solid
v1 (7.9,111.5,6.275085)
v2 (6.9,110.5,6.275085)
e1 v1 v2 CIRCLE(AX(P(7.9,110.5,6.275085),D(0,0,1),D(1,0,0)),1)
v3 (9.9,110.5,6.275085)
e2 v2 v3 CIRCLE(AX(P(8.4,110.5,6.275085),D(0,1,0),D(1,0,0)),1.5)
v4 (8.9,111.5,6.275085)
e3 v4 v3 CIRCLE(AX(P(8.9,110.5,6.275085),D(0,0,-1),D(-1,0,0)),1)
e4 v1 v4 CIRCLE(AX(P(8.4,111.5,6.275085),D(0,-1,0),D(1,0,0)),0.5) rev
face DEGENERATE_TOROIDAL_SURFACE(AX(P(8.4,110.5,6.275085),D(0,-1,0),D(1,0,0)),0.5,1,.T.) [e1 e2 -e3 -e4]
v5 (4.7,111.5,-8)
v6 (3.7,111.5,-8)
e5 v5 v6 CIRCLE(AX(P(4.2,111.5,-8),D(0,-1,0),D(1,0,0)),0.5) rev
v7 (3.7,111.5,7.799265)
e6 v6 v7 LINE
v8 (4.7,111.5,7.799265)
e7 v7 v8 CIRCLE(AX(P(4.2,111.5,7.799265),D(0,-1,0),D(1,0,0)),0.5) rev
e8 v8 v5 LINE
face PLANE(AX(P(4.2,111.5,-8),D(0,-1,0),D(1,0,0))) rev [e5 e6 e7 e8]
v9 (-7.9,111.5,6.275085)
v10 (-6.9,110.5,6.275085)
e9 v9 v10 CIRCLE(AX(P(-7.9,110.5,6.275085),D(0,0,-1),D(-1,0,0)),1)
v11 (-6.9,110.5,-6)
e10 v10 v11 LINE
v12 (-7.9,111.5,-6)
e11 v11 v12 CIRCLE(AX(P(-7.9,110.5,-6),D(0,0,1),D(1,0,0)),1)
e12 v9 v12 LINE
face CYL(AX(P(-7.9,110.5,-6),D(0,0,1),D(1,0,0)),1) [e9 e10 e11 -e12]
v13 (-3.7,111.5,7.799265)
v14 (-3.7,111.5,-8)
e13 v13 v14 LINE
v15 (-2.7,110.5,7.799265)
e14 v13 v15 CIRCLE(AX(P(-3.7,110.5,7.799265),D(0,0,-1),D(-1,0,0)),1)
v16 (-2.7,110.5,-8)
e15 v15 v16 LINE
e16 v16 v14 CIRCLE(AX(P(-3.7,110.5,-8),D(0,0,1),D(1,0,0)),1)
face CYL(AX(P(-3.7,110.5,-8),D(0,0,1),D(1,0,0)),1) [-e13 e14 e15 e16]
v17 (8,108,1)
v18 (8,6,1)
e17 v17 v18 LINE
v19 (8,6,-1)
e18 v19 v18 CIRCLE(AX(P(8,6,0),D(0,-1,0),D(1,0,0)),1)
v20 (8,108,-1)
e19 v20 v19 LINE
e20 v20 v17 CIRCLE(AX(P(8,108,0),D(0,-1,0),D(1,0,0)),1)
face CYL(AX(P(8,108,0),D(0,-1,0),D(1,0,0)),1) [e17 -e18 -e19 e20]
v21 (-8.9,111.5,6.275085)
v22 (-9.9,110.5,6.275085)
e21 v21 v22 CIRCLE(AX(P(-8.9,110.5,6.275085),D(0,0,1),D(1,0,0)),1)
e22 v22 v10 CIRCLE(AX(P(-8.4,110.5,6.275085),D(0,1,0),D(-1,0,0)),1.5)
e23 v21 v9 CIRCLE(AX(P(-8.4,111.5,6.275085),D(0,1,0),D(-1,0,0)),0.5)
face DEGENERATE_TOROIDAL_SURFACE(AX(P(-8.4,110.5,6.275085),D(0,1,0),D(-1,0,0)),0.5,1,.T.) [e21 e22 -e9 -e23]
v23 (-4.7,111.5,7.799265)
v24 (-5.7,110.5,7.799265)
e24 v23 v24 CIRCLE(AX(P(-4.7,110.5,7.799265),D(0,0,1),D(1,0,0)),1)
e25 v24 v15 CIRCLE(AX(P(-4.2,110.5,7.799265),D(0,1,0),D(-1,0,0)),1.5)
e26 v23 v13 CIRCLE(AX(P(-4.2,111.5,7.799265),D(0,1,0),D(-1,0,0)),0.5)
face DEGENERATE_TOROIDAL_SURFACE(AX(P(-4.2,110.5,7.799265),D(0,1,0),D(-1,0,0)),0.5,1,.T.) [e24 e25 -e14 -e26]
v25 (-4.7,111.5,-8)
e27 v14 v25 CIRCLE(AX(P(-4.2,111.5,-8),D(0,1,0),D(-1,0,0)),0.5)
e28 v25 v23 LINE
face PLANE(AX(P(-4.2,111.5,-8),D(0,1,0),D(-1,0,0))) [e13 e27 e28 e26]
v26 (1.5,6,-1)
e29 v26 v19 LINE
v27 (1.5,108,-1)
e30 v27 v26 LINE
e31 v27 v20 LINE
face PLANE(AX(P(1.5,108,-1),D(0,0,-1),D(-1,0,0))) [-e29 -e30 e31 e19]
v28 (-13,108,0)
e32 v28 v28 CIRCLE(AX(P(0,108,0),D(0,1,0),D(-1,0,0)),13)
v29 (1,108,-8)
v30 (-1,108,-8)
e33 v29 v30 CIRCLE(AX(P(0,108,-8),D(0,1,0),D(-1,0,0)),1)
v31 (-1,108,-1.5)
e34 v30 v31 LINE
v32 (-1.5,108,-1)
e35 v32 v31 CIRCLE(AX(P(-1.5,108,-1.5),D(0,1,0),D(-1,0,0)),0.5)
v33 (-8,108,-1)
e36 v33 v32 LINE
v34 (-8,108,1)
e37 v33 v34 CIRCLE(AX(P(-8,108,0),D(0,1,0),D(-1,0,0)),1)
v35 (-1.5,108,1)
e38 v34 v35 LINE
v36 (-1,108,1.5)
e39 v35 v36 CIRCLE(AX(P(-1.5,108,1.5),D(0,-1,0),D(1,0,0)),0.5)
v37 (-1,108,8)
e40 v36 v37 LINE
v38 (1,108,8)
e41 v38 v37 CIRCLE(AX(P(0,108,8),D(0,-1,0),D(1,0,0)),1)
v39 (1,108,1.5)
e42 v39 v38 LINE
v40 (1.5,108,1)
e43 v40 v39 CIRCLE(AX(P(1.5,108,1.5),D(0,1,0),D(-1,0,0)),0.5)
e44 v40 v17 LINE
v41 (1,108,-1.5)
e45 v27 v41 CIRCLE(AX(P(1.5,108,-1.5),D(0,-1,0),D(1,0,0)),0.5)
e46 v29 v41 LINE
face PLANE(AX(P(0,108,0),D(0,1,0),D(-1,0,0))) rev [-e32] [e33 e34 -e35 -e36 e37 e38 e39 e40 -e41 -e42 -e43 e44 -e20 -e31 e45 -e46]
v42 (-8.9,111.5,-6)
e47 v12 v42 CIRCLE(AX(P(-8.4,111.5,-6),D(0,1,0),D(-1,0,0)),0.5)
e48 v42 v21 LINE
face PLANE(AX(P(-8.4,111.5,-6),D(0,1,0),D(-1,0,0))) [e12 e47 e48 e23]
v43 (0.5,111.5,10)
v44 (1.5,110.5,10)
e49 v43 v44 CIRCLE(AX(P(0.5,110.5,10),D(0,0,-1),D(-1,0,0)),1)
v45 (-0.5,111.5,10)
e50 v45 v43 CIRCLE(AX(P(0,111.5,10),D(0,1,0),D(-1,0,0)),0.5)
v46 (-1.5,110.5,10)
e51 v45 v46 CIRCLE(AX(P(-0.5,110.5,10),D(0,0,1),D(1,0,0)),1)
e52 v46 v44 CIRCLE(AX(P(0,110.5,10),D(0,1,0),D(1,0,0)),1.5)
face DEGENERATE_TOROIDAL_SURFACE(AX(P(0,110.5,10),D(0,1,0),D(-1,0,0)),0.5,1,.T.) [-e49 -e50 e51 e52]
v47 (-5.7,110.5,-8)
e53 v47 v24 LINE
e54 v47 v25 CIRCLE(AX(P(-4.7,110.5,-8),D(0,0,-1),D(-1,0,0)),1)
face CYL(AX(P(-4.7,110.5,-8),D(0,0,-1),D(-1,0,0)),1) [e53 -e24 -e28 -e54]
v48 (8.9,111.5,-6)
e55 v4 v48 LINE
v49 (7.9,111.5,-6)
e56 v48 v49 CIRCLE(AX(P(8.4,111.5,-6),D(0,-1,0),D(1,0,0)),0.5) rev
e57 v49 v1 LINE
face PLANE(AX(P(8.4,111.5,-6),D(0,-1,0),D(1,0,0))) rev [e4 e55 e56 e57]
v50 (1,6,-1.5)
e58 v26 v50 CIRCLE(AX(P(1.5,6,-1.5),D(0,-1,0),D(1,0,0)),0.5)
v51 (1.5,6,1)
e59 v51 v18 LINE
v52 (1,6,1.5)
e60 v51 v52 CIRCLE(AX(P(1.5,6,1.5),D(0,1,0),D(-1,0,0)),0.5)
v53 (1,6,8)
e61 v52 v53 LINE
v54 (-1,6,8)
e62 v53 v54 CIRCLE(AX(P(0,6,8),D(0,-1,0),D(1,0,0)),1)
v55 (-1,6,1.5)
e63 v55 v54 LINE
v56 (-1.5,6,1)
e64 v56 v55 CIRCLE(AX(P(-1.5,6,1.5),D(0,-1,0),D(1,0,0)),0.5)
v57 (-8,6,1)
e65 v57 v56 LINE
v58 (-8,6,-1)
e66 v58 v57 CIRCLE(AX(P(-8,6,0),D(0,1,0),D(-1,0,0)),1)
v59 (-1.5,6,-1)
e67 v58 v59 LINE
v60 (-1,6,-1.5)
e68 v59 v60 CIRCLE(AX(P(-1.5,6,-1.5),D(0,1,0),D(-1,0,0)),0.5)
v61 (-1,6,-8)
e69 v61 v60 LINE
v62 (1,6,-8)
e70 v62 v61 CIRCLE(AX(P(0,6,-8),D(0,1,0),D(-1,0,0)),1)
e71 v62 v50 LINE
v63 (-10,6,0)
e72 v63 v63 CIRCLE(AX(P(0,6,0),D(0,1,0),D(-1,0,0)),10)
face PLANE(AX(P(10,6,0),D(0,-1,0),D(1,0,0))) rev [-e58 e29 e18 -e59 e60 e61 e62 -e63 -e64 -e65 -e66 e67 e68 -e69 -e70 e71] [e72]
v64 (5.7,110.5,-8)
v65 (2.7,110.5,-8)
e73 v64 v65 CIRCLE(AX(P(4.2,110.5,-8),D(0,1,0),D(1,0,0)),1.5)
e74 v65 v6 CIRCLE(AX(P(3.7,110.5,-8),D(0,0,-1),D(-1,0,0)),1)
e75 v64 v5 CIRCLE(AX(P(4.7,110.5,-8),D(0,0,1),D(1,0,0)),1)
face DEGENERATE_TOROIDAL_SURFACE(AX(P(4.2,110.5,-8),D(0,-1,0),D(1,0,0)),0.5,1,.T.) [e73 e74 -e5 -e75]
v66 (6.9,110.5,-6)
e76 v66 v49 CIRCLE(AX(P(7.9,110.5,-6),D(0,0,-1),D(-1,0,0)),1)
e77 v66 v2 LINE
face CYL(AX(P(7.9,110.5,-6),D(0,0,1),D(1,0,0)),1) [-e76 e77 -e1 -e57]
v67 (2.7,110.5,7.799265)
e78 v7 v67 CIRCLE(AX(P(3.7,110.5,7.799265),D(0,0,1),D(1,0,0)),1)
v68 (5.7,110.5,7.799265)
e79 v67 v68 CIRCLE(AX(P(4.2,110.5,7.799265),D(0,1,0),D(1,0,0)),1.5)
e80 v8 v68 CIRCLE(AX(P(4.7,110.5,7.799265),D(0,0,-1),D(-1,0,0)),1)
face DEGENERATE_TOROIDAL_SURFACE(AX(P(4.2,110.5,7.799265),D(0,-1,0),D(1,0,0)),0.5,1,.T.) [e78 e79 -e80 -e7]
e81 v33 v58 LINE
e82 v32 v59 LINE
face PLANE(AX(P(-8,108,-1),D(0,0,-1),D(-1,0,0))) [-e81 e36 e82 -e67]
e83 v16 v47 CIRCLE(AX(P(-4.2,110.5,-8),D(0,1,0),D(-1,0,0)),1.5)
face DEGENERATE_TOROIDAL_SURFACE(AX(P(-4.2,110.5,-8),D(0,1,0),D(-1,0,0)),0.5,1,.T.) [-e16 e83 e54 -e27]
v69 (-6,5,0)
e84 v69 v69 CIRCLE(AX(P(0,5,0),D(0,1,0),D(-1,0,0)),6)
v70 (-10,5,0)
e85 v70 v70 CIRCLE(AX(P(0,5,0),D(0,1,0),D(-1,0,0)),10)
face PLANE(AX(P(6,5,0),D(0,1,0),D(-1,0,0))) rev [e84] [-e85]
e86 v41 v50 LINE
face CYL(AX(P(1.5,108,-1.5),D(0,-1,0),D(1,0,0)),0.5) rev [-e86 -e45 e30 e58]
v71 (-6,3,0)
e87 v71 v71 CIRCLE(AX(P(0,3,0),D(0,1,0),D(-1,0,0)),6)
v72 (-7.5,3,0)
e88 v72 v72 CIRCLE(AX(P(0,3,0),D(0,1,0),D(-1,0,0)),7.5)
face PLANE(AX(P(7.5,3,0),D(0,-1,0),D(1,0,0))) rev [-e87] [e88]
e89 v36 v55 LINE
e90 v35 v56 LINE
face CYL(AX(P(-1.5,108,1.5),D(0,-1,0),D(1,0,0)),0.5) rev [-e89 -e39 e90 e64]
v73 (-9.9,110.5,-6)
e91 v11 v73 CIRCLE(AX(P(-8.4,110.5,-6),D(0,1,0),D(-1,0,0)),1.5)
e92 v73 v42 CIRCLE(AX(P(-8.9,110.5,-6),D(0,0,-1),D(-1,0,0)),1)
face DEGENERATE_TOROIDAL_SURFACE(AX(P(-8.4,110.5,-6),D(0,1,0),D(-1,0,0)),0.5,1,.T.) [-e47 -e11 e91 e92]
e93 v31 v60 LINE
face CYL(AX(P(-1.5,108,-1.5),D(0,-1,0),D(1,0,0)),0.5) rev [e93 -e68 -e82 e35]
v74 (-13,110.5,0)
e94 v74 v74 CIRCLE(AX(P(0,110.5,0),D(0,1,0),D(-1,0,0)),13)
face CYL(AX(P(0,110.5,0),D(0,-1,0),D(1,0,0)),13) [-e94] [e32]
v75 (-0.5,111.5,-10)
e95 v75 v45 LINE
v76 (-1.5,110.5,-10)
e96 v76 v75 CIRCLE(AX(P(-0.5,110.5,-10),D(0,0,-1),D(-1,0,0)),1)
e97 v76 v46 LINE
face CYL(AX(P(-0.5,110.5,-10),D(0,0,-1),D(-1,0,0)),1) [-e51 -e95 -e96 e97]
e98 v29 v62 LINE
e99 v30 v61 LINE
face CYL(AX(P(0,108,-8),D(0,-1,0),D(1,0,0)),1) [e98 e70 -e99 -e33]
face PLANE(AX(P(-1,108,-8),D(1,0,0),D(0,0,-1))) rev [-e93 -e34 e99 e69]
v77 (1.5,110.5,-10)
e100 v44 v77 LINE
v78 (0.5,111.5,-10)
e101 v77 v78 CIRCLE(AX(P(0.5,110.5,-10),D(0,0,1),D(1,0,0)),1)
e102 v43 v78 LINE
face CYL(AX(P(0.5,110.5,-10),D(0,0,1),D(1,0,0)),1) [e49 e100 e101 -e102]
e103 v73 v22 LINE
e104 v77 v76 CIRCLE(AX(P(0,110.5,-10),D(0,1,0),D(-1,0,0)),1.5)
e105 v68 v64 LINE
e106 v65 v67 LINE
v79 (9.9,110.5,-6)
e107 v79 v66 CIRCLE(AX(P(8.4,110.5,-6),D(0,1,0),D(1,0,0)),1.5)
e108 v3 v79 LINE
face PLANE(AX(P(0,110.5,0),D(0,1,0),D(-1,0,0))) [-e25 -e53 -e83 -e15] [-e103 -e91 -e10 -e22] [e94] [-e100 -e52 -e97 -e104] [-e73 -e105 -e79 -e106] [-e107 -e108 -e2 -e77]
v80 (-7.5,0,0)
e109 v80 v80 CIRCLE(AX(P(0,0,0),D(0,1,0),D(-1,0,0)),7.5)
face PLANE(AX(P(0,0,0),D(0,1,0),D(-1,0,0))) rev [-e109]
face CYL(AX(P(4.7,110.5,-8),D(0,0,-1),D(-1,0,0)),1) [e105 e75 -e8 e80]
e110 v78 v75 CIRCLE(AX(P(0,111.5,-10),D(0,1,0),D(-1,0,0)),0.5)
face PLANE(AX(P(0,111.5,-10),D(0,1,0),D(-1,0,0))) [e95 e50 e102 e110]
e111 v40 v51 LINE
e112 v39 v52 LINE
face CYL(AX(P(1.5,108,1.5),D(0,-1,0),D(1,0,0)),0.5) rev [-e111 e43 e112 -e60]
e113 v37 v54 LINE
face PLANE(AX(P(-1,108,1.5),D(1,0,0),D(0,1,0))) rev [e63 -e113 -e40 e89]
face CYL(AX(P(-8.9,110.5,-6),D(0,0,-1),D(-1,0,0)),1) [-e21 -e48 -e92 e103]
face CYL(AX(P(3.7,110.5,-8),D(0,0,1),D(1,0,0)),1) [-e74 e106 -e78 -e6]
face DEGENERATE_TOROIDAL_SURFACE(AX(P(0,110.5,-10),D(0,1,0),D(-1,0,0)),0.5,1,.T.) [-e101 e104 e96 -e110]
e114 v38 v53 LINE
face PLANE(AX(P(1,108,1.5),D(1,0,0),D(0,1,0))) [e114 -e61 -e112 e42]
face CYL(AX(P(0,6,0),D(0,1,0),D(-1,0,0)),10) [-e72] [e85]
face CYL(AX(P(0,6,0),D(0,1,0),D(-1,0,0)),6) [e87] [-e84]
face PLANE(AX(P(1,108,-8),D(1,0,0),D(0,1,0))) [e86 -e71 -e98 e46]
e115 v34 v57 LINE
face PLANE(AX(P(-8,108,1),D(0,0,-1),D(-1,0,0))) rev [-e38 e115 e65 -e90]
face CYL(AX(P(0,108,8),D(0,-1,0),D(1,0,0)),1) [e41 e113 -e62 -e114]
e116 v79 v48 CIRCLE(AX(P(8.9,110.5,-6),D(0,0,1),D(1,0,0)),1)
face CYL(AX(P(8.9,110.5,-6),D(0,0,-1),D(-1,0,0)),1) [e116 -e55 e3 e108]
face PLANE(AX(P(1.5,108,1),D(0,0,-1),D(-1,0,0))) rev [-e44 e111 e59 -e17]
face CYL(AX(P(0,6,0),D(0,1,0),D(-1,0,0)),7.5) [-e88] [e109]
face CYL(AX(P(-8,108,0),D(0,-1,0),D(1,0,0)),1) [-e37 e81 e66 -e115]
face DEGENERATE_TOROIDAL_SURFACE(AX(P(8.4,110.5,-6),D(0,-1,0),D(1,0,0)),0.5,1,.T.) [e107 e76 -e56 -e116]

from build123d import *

# Parameters (mm, degrees)
BOSS_EXTRUDE1_DEPTH = 102
SKETCH5_R           = 13
BOSS_EXTRUDE2_DEPTH = 2.5
BOSS_EXTRUDE3_DEPTH = 1
FILLET1_R           = 1


with BuildPart() as part:
    # Sketch1 → Revolve1 (revolve)
    with BuildSketch(Plane.XY, mode=Mode.PRIVATE) as revolve1_sk:
        Polygon((0, 0), (7.5, 0), (7.5, 3), (6, 3), (6, 5), (10, 5), (10, 6), (0, 6), align=None)
    revolve(revolve1_sk.sketch.rotate(Axis((0, 6, 0), (0, -1, 0)), 180), axis=Axis((0, 6, 0), (0, -1, 0)))

    # Sketch4 → Boss-Extrude1 (add)
    with BuildSketch(Plane(origin=(0, 6, 0), x_dir=(1, 0, 0), z_dir=(0, 1, 0))):
        with BuildLine():
            Line((-1, 8), (-1, 1.5))
            ThreePointArc((-1, 1.5), (-1.146446609, 1.146446609), (-1.5, 1))
            Line((-1.5, 1), (-8, 1))
            ThreePointArc((-8, 1), (-9, 0), (-8, -1))
            Line((-8, -1), (-1.5, -1))
            ThreePointArc((-1.5, -1), (-1.146446609, -1.146446609), (-1, -1.5))
            Line((-1, -1.5), (-1, -8))
            ThreePointArc((-1, -8), (0, -9), (1, -8))
            Line((1, -8), (1, -1.5))
            ThreePointArc((1, -1.5), (1.146446609, -1.146446609), (1.5, -1))
            Line((1.5, -1), (8, -1))
            ThreePointArc((8, -1), (9, 0), (8, 1))
            Line((8, 1), (1.5, 1))
            ThreePointArc((1.5, 1), (1.146446609, 1.146446609), (1, 1.5))
            Line((1, 1.5), (1, 8))
            ThreePointArc((1, 8), (0, 9), (-1, 8))
        make_face()
    extrude(amount=BOSS_EXTRUDE1_DEPTH)

    # Sketch5 → Boss-Extrude2 (add)
    with BuildSketch(Plane(origin=(0, 108, 0), x_dir=(1, 0, 0), z_dir=(0, 1, 0))):
        with Locations(Location((0, 0, 0), (0, 0, 180))):
            Circle(SKETCH5_R)
    extrude(amount=BOSS_EXTRUDE2_DEPTH)

    # Sketch6 → Boss-Extrude3 (add)
    with BuildSketch(Plane(origin=(0, 110.5, 0), x_dir=(1, 0, 0), z_dir=(0, 1, 0))):
        with BuildLine():
            Line((-1.5, 10), (-1.5, -10))
            ThreePointArc((-1.5, -10), (0, -11.5), (1.5, -10))
            Line((1.5, -10), (1.5, 10))
            ThreePointArc((1.5, 10), (0, 11.5), (-1.5, 10))
        make_face()
        with BuildLine():
            Line((-5.7, 8), (-5.7, -7.799265344))
            ThreePointArc((-5.7, -7.799265344), (-4.2, -9.299265344), (-2.7, -7.799265344))
            Line((-2.7, -7.799265344), (-2.7, 8))
            ThreePointArc((-2.7, 8), (-4.2, 9.5), (-5.7, 8))
        make_face()
        with BuildLine():
            Line((-9.9, 6), (-9.9, -6.275084591))
            ThreePointArc((-9.9, -6.275084591), (-8.4, -7.775084591), (-6.9, -6.275084591))
            Line((-6.9, -6.275084591), (-6.9, 6))
            ThreePointArc((-6.9, 6), (-8.4, 7.5), (-9.9, 6))
        make_face()
        with BuildLine():
            Line((9.9, 6), (9.9, -6.275084591))
            ThreePointArc((9.9, -6.275084591), (8.4, -7.775084591), (6.9, -6.275084591))
            Line((6.9, -6.275084591), (6.9, 6))
            ThreePointArc((6.9, 6), (8.4, 7.5), (9.9, 6))
        make_face()
        with BuildLine():
            Line((5.7, 8), (5.7, -7.799265344))
            ThreePointArc((5.7, -7.799265344), (4.2, -9.299265344), (2.7, -7.799265344))
            Line((2.7, -7.799265344), (2.7, 8))
            ThreePointArc((2.7, 8), (4.2, 9.5), (5.7, 8))
        make_face()
    extrude(amount=BOSS_EXTRUDE3_DEPTH)

    # Fillet1
    fillet1_edges = [part.edges().sort_by_distance(p)[0] for p in [
        (9.9, 111.5, 0.137542295),
        (8.4, 111.5, 7.775084591),
        (6.9, 111.5, 0.137542295),
        (8.4, 111.5, -7.5),
        (5.7, 111.5, -0.100367328),
        (4.2, 111.5, 9.299265344),
        (2.7, 111.5, -0.100367328),
        (4.2, 111.5, -9.5),
        (1.5, 111.5, 0),
        (0, 111.5, 11.5),
        (-1.5, 111.5, 0),
        (0, 111.5, -11.5),
        (-2.7, 111.5, -0.100367328),
        (-4.2, 111.5, 9.299265344),
        (-5.7, 111.5, -0.100367328),
        (-4.2, 111.5, -9.5),
        (-6.9, 111.5, 0.137542295),
        (-8.4, 111.5, 7.775084591),
        (-9.9, 111.5, 0.137542295),
        (-8.4, 111.5, -7.5),
    ]]
    fillet(fillet1_edges, radius=FILLET1_R - 0.0001)  # a hair under: the kernel refuses the full size


solid = part.part
